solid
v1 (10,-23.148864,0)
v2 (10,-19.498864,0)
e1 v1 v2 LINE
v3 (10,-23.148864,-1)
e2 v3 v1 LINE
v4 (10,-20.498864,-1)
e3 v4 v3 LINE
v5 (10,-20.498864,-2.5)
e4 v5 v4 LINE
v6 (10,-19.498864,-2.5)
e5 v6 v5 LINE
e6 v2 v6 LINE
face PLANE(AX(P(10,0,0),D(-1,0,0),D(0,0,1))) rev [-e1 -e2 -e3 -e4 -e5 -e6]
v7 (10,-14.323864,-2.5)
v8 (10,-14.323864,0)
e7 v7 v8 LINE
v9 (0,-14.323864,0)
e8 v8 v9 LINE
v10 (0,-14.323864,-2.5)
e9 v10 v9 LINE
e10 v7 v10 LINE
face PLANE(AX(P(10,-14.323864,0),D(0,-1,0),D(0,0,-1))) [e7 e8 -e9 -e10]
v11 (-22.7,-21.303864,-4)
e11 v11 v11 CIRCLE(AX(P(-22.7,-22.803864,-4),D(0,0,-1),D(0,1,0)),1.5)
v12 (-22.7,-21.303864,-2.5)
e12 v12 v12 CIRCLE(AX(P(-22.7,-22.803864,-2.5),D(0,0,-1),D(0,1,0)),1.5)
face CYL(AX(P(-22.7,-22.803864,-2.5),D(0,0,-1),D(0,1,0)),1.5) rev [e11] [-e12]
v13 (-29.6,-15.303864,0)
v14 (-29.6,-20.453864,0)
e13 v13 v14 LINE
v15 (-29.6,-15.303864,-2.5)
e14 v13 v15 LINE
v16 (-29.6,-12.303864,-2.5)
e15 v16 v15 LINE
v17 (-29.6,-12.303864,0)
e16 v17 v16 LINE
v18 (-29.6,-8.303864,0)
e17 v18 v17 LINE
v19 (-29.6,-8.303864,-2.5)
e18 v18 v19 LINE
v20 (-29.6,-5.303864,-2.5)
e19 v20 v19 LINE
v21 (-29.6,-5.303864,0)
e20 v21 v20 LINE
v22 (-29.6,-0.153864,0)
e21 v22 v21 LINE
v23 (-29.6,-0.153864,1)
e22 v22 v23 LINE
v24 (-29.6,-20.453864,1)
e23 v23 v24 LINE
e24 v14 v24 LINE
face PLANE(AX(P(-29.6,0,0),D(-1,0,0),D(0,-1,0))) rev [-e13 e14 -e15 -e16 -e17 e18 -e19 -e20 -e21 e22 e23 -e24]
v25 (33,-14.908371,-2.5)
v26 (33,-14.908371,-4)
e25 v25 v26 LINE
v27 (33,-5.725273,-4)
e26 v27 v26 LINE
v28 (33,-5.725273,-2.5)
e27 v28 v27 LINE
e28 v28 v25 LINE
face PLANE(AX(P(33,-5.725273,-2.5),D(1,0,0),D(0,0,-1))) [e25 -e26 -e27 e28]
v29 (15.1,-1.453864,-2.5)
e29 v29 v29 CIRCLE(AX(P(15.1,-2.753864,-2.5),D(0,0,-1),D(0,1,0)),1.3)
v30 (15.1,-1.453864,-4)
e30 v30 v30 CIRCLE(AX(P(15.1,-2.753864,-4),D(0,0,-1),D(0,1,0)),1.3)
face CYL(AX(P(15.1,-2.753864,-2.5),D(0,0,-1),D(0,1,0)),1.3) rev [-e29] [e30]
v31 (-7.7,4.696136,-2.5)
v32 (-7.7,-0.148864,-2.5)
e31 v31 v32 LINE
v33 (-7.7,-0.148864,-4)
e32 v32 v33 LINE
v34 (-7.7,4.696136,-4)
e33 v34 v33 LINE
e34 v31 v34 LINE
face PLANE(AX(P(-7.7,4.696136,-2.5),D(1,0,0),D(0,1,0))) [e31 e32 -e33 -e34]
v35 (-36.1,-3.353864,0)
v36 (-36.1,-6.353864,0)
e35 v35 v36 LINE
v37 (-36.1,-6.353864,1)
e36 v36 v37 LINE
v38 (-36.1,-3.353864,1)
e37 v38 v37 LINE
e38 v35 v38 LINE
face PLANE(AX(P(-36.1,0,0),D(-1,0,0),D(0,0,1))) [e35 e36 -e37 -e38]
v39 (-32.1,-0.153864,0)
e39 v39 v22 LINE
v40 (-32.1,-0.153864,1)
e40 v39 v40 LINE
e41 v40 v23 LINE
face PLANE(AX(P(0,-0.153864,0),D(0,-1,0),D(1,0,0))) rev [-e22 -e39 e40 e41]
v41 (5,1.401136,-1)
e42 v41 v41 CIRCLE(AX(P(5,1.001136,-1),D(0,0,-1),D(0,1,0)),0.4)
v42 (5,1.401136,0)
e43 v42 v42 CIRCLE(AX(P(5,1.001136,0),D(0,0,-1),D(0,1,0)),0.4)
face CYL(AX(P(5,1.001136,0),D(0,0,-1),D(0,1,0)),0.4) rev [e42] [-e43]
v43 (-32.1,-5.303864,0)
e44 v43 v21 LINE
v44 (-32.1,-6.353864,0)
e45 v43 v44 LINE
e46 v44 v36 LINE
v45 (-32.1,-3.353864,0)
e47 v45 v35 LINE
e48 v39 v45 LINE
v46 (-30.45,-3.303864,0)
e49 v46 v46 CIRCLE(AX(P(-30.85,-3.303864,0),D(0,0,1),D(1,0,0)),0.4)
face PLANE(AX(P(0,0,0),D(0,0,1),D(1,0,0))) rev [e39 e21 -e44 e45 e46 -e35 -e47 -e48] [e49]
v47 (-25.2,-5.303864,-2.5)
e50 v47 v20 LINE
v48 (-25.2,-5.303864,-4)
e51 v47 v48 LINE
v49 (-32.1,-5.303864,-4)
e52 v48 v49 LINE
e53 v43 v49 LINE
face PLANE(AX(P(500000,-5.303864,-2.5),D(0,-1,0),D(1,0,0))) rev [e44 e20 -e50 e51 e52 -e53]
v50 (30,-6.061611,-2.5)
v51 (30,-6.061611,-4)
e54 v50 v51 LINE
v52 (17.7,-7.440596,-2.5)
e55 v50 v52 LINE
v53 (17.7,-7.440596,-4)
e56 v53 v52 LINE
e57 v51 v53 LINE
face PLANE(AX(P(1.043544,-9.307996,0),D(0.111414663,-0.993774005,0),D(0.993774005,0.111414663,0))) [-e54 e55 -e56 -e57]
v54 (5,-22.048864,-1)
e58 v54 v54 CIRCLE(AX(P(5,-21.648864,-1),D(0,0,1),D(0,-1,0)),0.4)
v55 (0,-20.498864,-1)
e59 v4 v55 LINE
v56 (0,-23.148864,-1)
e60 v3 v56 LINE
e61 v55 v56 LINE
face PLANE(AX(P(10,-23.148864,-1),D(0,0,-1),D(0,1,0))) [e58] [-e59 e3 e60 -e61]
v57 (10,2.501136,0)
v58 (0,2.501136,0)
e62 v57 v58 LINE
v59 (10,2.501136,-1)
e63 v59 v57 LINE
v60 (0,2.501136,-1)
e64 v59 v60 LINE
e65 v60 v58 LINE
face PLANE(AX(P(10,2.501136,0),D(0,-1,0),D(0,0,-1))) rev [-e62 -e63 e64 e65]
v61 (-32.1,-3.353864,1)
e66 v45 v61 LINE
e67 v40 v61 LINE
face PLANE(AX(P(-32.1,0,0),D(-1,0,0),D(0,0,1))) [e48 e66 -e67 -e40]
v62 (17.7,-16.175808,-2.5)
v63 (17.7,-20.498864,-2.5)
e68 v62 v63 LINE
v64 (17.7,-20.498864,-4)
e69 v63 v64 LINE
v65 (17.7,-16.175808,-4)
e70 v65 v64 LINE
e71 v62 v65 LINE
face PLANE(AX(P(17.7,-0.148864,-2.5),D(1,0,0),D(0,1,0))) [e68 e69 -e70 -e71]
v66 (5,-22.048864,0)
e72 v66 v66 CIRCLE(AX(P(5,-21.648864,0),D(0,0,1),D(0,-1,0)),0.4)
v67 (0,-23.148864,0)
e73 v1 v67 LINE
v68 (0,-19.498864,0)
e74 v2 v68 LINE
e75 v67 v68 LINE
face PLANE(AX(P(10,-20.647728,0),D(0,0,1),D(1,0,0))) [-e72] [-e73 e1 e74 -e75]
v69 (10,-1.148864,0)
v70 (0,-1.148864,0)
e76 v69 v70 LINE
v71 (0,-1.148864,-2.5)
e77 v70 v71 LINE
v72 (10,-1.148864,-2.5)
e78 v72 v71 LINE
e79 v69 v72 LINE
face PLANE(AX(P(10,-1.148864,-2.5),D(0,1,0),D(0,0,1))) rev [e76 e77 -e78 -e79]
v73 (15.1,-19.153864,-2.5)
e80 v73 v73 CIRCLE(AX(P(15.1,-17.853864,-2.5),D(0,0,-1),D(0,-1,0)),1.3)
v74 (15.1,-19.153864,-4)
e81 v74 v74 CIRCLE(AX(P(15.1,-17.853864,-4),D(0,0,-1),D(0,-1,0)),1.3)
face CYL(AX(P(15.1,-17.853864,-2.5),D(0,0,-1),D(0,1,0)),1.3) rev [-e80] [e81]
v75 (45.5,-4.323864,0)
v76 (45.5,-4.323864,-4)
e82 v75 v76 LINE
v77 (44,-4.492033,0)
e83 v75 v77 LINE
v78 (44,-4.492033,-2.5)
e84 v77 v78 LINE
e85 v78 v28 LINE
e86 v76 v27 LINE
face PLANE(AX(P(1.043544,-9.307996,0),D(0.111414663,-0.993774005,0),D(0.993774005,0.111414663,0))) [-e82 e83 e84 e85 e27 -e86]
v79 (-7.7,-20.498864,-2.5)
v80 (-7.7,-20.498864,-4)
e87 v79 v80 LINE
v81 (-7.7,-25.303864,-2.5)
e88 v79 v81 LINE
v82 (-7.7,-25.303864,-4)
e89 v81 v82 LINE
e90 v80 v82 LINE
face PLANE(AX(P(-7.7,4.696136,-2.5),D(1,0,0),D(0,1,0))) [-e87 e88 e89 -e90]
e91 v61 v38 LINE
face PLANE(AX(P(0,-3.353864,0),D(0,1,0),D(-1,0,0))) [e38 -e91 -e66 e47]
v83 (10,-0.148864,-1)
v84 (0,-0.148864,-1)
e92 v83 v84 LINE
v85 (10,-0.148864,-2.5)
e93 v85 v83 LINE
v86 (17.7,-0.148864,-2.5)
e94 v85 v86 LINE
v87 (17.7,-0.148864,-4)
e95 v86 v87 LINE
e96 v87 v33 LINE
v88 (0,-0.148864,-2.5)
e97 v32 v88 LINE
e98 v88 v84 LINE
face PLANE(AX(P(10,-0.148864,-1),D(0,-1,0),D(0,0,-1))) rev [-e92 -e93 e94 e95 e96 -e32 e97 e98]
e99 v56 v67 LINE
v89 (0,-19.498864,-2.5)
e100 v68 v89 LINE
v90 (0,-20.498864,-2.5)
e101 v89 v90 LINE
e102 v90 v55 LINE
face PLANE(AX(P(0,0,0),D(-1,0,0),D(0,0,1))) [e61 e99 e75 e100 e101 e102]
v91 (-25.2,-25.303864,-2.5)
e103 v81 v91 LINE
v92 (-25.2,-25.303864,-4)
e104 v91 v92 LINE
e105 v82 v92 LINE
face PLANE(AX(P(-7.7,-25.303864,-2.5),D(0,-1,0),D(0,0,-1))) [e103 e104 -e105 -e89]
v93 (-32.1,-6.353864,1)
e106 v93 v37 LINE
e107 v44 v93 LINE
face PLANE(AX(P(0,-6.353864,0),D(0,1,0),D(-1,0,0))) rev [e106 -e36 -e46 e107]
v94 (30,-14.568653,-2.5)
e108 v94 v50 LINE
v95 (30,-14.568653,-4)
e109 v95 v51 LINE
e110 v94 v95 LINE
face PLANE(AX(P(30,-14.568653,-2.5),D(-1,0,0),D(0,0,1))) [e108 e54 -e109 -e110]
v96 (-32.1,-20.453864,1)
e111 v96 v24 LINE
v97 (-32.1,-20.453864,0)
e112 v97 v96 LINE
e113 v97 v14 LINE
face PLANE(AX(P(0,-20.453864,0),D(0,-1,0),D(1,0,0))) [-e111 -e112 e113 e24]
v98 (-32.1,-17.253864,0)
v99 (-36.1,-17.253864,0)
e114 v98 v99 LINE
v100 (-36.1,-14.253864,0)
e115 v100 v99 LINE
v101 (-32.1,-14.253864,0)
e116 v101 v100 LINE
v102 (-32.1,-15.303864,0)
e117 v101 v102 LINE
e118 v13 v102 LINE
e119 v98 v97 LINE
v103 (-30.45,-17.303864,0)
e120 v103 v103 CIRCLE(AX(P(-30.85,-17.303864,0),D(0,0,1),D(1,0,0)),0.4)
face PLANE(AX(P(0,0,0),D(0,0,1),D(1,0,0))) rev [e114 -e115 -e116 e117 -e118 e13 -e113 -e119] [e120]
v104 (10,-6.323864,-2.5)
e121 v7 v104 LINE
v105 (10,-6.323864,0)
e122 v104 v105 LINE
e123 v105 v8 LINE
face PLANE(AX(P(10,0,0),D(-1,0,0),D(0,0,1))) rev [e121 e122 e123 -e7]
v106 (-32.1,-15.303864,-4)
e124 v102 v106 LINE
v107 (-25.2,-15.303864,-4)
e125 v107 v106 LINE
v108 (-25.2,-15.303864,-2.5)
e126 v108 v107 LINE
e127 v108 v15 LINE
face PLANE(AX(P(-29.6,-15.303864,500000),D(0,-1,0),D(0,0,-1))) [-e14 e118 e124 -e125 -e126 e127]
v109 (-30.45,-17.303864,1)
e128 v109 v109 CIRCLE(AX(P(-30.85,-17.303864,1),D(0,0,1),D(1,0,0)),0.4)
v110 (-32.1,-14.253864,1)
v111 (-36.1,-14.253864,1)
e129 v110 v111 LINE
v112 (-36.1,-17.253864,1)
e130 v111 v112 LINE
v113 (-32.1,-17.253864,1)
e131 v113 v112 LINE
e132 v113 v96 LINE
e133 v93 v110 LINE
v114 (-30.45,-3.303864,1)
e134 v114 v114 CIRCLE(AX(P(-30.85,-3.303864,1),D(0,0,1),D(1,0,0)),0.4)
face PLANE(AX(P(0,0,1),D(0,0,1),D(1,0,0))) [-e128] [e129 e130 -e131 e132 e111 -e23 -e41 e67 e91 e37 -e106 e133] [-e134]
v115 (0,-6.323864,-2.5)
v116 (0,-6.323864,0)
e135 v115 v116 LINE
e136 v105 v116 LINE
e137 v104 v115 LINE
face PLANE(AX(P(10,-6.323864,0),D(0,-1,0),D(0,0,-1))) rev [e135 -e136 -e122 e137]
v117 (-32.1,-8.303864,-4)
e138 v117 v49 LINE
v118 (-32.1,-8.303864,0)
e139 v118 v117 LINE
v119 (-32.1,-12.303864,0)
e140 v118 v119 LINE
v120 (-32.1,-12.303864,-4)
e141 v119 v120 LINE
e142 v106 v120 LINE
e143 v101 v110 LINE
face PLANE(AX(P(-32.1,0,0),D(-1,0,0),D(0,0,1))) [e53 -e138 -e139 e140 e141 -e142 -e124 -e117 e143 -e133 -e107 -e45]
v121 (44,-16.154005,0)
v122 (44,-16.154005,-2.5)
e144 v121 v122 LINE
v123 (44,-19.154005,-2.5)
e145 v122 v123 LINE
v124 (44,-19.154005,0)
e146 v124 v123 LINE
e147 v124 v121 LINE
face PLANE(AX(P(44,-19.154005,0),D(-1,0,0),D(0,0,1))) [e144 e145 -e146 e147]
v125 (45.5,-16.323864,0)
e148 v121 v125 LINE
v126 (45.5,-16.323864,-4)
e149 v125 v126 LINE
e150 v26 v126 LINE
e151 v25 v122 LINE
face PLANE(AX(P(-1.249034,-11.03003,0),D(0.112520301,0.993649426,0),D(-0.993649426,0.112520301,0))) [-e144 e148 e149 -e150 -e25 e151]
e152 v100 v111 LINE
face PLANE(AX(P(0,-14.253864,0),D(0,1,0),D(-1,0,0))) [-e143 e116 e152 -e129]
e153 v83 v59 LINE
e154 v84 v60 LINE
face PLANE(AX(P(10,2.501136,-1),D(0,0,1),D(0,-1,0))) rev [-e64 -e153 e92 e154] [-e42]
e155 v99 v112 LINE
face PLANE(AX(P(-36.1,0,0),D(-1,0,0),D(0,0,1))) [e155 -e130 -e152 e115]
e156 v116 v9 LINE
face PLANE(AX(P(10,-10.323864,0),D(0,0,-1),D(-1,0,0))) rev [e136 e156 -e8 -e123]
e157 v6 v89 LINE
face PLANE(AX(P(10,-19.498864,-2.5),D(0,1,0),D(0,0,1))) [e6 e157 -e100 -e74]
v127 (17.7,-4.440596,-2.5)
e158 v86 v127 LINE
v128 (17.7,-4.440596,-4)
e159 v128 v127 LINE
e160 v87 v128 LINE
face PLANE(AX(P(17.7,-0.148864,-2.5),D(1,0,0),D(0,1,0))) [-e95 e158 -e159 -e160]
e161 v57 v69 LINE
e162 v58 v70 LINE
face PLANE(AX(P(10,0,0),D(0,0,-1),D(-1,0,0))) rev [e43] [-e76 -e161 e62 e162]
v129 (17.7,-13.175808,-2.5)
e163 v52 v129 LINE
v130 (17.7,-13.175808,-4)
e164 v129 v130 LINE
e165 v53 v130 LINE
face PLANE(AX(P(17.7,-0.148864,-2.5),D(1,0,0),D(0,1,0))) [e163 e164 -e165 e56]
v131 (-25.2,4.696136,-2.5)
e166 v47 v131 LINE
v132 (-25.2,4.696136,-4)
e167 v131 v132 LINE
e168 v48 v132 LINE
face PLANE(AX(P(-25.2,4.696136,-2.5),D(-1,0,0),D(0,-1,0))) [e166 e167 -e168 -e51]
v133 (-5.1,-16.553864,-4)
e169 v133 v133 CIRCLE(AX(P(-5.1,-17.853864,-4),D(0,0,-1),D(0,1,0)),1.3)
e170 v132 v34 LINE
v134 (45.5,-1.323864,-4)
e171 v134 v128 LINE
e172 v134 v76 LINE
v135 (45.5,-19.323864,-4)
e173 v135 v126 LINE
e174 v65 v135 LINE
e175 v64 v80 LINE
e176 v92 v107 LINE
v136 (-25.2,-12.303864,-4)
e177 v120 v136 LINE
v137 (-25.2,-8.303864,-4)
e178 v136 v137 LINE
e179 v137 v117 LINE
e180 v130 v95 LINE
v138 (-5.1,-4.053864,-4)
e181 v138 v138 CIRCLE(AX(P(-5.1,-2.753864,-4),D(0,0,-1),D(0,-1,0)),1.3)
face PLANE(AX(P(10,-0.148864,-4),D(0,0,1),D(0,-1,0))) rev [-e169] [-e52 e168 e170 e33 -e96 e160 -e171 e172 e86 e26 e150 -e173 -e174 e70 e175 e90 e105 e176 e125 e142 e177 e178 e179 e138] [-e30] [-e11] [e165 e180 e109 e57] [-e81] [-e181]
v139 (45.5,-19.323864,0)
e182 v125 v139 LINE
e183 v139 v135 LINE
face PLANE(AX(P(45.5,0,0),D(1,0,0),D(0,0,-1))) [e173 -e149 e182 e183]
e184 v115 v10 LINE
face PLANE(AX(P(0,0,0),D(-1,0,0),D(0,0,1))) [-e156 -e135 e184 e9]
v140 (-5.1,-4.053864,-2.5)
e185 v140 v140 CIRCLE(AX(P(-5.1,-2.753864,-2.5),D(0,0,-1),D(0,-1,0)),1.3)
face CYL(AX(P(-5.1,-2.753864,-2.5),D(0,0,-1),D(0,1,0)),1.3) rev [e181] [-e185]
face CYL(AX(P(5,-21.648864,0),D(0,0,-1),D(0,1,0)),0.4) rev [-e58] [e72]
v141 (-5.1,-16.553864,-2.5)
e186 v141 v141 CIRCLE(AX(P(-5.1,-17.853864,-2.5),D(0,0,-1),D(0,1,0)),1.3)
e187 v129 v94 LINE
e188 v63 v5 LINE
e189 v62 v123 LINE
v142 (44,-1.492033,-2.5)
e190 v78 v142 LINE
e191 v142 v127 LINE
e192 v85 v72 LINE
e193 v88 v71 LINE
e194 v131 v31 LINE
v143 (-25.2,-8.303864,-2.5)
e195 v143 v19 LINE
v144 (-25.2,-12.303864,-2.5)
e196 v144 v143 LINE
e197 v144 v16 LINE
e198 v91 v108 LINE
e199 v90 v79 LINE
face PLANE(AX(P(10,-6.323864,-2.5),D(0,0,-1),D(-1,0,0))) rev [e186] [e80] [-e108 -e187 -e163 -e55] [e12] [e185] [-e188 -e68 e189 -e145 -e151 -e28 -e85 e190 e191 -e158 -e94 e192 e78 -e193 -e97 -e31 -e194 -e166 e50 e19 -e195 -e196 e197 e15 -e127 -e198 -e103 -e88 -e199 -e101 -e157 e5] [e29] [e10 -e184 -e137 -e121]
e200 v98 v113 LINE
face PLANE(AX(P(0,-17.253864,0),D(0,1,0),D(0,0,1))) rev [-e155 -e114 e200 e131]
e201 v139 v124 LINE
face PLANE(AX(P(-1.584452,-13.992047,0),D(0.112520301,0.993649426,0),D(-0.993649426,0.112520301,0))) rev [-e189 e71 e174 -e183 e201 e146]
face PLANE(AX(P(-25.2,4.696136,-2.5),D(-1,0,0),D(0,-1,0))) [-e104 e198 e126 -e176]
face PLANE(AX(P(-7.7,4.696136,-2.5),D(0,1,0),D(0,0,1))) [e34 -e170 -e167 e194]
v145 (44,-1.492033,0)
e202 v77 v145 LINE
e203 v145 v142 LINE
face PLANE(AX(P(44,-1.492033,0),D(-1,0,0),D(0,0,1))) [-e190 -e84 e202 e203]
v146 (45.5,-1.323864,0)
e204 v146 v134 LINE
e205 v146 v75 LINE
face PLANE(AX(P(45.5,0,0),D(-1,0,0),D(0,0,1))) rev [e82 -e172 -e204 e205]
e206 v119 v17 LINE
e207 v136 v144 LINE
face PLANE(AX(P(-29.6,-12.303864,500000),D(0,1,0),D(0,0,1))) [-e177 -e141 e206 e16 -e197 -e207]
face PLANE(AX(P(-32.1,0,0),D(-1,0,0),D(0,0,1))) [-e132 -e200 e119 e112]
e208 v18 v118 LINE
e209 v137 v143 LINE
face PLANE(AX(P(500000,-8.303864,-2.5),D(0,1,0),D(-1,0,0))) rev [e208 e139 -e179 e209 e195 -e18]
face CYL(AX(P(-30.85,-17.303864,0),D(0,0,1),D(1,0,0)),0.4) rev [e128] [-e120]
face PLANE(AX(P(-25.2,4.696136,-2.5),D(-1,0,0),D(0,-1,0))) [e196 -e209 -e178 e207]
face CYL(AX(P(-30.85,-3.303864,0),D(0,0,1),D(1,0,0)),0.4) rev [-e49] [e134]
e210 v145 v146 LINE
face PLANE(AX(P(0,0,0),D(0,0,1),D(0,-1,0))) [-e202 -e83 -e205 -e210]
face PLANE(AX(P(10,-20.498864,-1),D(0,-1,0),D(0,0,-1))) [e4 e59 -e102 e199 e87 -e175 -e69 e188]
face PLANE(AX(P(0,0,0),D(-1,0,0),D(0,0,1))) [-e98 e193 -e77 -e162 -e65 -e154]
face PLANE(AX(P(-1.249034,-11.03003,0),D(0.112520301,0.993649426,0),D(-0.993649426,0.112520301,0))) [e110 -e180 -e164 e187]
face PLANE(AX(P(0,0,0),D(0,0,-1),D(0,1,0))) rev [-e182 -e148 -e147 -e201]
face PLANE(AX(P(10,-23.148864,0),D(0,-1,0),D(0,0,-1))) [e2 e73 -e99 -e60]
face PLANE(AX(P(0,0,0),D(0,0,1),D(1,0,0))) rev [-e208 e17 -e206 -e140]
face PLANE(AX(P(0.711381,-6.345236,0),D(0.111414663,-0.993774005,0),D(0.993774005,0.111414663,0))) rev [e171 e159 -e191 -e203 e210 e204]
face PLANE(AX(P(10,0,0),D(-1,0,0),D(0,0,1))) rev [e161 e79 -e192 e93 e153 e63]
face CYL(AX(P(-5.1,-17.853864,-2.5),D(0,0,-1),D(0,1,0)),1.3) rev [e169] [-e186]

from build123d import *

# Parameters (mm, degrees)
EXTRUDE_1_DEPTH     = 10
SKETCH_2_R          = 0.4
CUT_EXTRUDE_1_DEPTH = 15.682716688
SKETCH_3_R          = 0.4
EXTRUDE_2_DEPTH     = 1
EXTRUDE_3_REACH     = 45.175
SKETCH_4_W          = 2.5
SKETCH_4_H          = 3
EXTRUDE_4_REACH     = 48.044
SKETCH_5_W          = 1.5
SKETCH_5_H          = 3
LOFT_START          = -4
LOFT_2_DEPTH        = 1.5
EXTRUDE_7_DEPTH     = 4
EXTRUDE_8_DEPTH     = 1.5
SKETCH_13_W         = 25.4
SKETCH_13_H         = 20.35
SKETCH_13_R         = 1.3
EXTRUDE_9_DEPTH     = 1.5
SKETCH_14_W         = 17.5
SKETCH_14_H         = 30
SKETCH_14_R         = 1.5
EXTRUDE_10_DEPTH    = 1.5


# Read off the part's stored shape, not the designer's step: По сечениям2
with BuildPart() as part:
    # Эскиз1 → Бобышка-Вытянуть1 (new body)
    with BuildSketch(Plane(origin=(0, 0, 0), x_dir=(0, 0, -1), z_dir=(1, 0, 0))):
        Polygon((0, 0), (0, 2.50113593), (1, 2.50113593), (1, -0.14886407), (4, -0.14886407), (4, -10.32386407), (0, -10.32386407), (0, -6.32386407), (2.5, -6.32386407), (2.5, -1.14886407), (0, -1.14886407), align=None)
    extrude_1 = extrude(amount=EXTRUDE_1_DEPTH)

    # Эскиз2 → Вырез-Вытянуть1 (cut, through all)
    with BuildSketch(Plane(origin=(0, 0, -1), x_dir=(-1, 0, 0), z_dir=(0, 0, -1))):
        with Locations(Location((-5, 1.00113593, 0), (0, 0, 90))):
            Circle(SKETCH_2_R)
    cut_extrude_1 = extrude(amount=-CUT_EXTRUDE_1_DEPTH, mode=Mode.SUBTRACT)

    # Зеркальное отражение1: Бобышка-Вытянуть1, Вырез-Вытянуть1 across plane
    add(extrude_1.mirror(Plane(origin=(10, -10.32386407, -4), x_dir=(0, 0, 1), z_dir=(0, 1, 0))))
    add(cut_extrude_1.mirror(Plane(origin=(10, -10.32386407, -4), x_dir=(0, 0, 1), z_dir=(0, 1, 0))), mode=Mode.SUBTRACT)

    # Эскиз5 → Бобышка-Вытянуть4 (add, up to next)
    with BuildSketch(Plane(origin=(-29.6, 0, 0), x_dir=(0, 0, -1), z_dir=(1, 0, 0)), mode=Mode.PRIVATE) as extrude_4_sk1:
        with Locations((3.25, -6.80386407)):
            Rectangle(SKETCH_5_W, SKETCH_5_H)
    extrude_4_tool1 = extrude(extrude_4_sk1.sketch, amount=EXTRUDE_4_REACH, mode=Mode.PRIVATE) - part.part
    # Эскиз5 → Бобышка-Вытянуть4 (add, up to next)
    with BuildSketch(Plane(origin=(-29.6, 0, 0), x_dir=(0, 0, -1), z_dir=(1, 0, 0)), mode=Mode.PRIVATE) as extrude_4_sk2:
        with Locations((3.25, -13.80386407)):
            Rectangle(SKETCH_5_W, SKETCH_5_H)
    extrude_4_tool2 = extrude(extrude_4_sk2.sketch, amount=EXTRUDE_4_REACH, mode=Mode.PRIVATE) - part.part


with BuildPart() as body_2:
    # Эскиз3 → Бобышка-Вытянуть2 (new body)
    with BuildSketch(Plane.XY.offset(1)):
        Polygon((-32.1, -0.15386407), (-32.1, -3.35386407), (-36.1, -3.35386407), (-36.1, -6.35386407), (-32.1, -6.35386407), (-32.1, -14.25386407), (-36.1, -14.25386407), (-36.1, -17.25386407), (-32.1, -17.25386407), (-32.1, -20.45386407), (-29.6, -20.45386407), (-29.6, -0.15386407), align=None)
        with Locations((-30.85, -3.30386407)):
            Circle(SKETCH_3_R, mode=Mode.SUBTRACT)
        with Locations((-30.85, -17.30386407)):
            Circle(SKETCH_3_R, mode=Mode.SUBTRACT)
    extrude(amount=-EXTRUDE_2_DEPTH)

    # Эскиз4 → Бобышка-Вытянуть3 (add, up to next)
    with BuildSketch(Plane(origin=(0, 0, -4), x_dir=(-1, 0, 0), z_dir=(0, 0, -1)), mode=Mode.PRIVATE) as extrude_3_sk1:
        with Locations((30.85, -6.80386407)):
            Rectangle(SKETCH_4_W, SKETCH_4_H)
    extrude_3_tool1 = extrude(extrude_3_sk1.sketch, amount=-EXTRUDE_3_REACH, mode=Mode.PRIVATE) - body_2.part
    # Эскиз4 → Бобышка-Вытянуть3 (add, up to next)
    with BuildSketch(Plane(origin=(0, 0, -4), x_dir=(-1, 0, 0), z_dir=(0, 0, -1)), mode=Mode.PRIVATE) as extrude_3_sk2:
        with Locations((30.85, -13.80386407)):
            Rectangle(SKETCH_4_W, SKETCH_4_H)
    extrude_3_tool2 = extrude(extrude_3_sk2.sketch, amount=-EXTRUDE_3_REACH, mode=Mode.PRIVATE) - body_2.part
    add(extrude_3_tool1.solids().sort_by_distance((-30.85, -6.803864, -4))[0])
    add(extrude_3_tool2.solids().sort_by_distance((-30.85, -13.803864, -4))[0])


with BuildPart() as part_1:
    add(part.part)

    add(body_2.part)  # Бобышка-Вытянуть4 merges body 2
    add(extrude_4_tool1.solids().sort_by_distance((-29.6, -6.803864, -3.25))[0])
    add(extrude_4_tool2.solids().sort_by_distance((-29.6, -13.803864, -3.25))[0])

    # Эскиз8 → По сечениям1 section 0
    with BuildSketch(Plane(origin=(45.5, 0, 0), x_dir=(0, 0, -1), z_dir=(1, 0, 0))):
        with BuildLine():
            Line((2.5, -1.32386407), (4, -1.32386407))
            Line((4, -1.32386407), (4, -4.32386407))
            Line((4, -4.32386407), (2.5, -4.32386407))
            Line((2.5, -4.32386407), (2.5, -1.32386407))
        make_face()
    # Эскиз7 → По сечениям1 section 1
    with BuildSketch(Plane(origin=(10, 0, 0), x_dir=(0, 0, -1), z_dir=(1, 0, 0))):
        with BuildLine():
            Line((2.5, -5.30386407), (4, -5.30386407))
            Line((4, -5.30386407), (4, -8.30386407))
            Line((4, -8.30386407), (2.5, -8.30386407))
            Line((2.5, -8.30386407), (2.5, -5.30386407))
        make_face()
    loft()

    # По сечениям2 outline → По сечениям2 (add)
    with BuildSketch(Plane.XY.offset(LOFT_START)):
        Polygon((10, -15.30386407), (45.5, -19.32386407), (45.5, -16.32386407), (10, -12.30386407), align=None)
    extrude(amount=LOFT_2_DEPTH)

    # Эскиз11 → Бобышка-Вытянуть7 (add)
    with BuildSketch(Plane(origin=(0, 0, -4), x_dir=(-1, 0, 0), z_dir=(0, 0, -1))):
        Polygon((-45.5, -1.32386407), (-44, -1.492033084), (-44, -4.492033084), (-45.5, -4.32386407), align=None)
        Polygon((-45.5, -16.32386407), (-45.5, -19.32386407), (-44, -19.154004915), (-44, -16.154004915), align=None)
    extrude(amount=-EXTRUDE_7_DEPTH)

    # Эскиз12 → Бобышка-Вытянуть8 (add)
    with BuildSketch(Plane(origin=(0, 0, -4), x_dir=(-1, 0, 0), z_dir=(0, 0, -1))):
        Polygon((-30, -6.061610549), (-33, -5.725272521), (-33, -14.908371112), (-30, -14.568652803), align=None)
    extrude(amount=-EXTRUDE_8_DEPTH)

    # Эскиз13 → Бобышка-Вытянуть9 (add)
    with BuildSketch(Plane(origin=(0, 0, -4), x_dir=(-1, 0, 0), z_dir=(0, 0, -1))):
        with Locations((-5, -10.32386407)):
            Rectangle(SKETCH_13_W, SKETCH_13_H)
        with Locations(Location((-15.1, -2.75386407, 0), (0, 0, 90))):
            Circle(SKETCH_13_R, mode=Mode.SUBTRACT)
        with Locations(Location((5.1, -2.75386407, 0), (0, 0, 270))):
            Circle(SKETCH_13_R, mode=Mode.SUBTRACT)
        with Locations(Location((5.1, -17.85386407, 0), (0, 0, 90))):
            Circle(SKETCH_13_R, mode=Mode.SUBTRACT)
        with Locations(Location((-15.1, -17.85386407, 0), (0, 0, 270))):
            Circle(SKETCH_13_R, mode=Mode.SUBTRACT)
    extrude(amount=-EXTRUDE_9_DEPTH)

    # Эскиз14 → Бобышка-Вытянуть10 (add)
    with BuildSketch(Plane(origin=(0, 0, -4), x_dir=(-1, 0, 0), z_dir=(0, 0, -1))):
        with Locations((16.45, -10.30386407)):
            Rectangle(SKETCH_14_W, SKETCH_14_H)
        with Locations(Location((22.7, -22.80386407, 0), (0, 0, 90))):
            Circle(SKETCH_14_R, mode=Mode.SUBTRACT)
    extrude(amount=-EXTRUDE_10_DEPTH)


solid = part_1.part
